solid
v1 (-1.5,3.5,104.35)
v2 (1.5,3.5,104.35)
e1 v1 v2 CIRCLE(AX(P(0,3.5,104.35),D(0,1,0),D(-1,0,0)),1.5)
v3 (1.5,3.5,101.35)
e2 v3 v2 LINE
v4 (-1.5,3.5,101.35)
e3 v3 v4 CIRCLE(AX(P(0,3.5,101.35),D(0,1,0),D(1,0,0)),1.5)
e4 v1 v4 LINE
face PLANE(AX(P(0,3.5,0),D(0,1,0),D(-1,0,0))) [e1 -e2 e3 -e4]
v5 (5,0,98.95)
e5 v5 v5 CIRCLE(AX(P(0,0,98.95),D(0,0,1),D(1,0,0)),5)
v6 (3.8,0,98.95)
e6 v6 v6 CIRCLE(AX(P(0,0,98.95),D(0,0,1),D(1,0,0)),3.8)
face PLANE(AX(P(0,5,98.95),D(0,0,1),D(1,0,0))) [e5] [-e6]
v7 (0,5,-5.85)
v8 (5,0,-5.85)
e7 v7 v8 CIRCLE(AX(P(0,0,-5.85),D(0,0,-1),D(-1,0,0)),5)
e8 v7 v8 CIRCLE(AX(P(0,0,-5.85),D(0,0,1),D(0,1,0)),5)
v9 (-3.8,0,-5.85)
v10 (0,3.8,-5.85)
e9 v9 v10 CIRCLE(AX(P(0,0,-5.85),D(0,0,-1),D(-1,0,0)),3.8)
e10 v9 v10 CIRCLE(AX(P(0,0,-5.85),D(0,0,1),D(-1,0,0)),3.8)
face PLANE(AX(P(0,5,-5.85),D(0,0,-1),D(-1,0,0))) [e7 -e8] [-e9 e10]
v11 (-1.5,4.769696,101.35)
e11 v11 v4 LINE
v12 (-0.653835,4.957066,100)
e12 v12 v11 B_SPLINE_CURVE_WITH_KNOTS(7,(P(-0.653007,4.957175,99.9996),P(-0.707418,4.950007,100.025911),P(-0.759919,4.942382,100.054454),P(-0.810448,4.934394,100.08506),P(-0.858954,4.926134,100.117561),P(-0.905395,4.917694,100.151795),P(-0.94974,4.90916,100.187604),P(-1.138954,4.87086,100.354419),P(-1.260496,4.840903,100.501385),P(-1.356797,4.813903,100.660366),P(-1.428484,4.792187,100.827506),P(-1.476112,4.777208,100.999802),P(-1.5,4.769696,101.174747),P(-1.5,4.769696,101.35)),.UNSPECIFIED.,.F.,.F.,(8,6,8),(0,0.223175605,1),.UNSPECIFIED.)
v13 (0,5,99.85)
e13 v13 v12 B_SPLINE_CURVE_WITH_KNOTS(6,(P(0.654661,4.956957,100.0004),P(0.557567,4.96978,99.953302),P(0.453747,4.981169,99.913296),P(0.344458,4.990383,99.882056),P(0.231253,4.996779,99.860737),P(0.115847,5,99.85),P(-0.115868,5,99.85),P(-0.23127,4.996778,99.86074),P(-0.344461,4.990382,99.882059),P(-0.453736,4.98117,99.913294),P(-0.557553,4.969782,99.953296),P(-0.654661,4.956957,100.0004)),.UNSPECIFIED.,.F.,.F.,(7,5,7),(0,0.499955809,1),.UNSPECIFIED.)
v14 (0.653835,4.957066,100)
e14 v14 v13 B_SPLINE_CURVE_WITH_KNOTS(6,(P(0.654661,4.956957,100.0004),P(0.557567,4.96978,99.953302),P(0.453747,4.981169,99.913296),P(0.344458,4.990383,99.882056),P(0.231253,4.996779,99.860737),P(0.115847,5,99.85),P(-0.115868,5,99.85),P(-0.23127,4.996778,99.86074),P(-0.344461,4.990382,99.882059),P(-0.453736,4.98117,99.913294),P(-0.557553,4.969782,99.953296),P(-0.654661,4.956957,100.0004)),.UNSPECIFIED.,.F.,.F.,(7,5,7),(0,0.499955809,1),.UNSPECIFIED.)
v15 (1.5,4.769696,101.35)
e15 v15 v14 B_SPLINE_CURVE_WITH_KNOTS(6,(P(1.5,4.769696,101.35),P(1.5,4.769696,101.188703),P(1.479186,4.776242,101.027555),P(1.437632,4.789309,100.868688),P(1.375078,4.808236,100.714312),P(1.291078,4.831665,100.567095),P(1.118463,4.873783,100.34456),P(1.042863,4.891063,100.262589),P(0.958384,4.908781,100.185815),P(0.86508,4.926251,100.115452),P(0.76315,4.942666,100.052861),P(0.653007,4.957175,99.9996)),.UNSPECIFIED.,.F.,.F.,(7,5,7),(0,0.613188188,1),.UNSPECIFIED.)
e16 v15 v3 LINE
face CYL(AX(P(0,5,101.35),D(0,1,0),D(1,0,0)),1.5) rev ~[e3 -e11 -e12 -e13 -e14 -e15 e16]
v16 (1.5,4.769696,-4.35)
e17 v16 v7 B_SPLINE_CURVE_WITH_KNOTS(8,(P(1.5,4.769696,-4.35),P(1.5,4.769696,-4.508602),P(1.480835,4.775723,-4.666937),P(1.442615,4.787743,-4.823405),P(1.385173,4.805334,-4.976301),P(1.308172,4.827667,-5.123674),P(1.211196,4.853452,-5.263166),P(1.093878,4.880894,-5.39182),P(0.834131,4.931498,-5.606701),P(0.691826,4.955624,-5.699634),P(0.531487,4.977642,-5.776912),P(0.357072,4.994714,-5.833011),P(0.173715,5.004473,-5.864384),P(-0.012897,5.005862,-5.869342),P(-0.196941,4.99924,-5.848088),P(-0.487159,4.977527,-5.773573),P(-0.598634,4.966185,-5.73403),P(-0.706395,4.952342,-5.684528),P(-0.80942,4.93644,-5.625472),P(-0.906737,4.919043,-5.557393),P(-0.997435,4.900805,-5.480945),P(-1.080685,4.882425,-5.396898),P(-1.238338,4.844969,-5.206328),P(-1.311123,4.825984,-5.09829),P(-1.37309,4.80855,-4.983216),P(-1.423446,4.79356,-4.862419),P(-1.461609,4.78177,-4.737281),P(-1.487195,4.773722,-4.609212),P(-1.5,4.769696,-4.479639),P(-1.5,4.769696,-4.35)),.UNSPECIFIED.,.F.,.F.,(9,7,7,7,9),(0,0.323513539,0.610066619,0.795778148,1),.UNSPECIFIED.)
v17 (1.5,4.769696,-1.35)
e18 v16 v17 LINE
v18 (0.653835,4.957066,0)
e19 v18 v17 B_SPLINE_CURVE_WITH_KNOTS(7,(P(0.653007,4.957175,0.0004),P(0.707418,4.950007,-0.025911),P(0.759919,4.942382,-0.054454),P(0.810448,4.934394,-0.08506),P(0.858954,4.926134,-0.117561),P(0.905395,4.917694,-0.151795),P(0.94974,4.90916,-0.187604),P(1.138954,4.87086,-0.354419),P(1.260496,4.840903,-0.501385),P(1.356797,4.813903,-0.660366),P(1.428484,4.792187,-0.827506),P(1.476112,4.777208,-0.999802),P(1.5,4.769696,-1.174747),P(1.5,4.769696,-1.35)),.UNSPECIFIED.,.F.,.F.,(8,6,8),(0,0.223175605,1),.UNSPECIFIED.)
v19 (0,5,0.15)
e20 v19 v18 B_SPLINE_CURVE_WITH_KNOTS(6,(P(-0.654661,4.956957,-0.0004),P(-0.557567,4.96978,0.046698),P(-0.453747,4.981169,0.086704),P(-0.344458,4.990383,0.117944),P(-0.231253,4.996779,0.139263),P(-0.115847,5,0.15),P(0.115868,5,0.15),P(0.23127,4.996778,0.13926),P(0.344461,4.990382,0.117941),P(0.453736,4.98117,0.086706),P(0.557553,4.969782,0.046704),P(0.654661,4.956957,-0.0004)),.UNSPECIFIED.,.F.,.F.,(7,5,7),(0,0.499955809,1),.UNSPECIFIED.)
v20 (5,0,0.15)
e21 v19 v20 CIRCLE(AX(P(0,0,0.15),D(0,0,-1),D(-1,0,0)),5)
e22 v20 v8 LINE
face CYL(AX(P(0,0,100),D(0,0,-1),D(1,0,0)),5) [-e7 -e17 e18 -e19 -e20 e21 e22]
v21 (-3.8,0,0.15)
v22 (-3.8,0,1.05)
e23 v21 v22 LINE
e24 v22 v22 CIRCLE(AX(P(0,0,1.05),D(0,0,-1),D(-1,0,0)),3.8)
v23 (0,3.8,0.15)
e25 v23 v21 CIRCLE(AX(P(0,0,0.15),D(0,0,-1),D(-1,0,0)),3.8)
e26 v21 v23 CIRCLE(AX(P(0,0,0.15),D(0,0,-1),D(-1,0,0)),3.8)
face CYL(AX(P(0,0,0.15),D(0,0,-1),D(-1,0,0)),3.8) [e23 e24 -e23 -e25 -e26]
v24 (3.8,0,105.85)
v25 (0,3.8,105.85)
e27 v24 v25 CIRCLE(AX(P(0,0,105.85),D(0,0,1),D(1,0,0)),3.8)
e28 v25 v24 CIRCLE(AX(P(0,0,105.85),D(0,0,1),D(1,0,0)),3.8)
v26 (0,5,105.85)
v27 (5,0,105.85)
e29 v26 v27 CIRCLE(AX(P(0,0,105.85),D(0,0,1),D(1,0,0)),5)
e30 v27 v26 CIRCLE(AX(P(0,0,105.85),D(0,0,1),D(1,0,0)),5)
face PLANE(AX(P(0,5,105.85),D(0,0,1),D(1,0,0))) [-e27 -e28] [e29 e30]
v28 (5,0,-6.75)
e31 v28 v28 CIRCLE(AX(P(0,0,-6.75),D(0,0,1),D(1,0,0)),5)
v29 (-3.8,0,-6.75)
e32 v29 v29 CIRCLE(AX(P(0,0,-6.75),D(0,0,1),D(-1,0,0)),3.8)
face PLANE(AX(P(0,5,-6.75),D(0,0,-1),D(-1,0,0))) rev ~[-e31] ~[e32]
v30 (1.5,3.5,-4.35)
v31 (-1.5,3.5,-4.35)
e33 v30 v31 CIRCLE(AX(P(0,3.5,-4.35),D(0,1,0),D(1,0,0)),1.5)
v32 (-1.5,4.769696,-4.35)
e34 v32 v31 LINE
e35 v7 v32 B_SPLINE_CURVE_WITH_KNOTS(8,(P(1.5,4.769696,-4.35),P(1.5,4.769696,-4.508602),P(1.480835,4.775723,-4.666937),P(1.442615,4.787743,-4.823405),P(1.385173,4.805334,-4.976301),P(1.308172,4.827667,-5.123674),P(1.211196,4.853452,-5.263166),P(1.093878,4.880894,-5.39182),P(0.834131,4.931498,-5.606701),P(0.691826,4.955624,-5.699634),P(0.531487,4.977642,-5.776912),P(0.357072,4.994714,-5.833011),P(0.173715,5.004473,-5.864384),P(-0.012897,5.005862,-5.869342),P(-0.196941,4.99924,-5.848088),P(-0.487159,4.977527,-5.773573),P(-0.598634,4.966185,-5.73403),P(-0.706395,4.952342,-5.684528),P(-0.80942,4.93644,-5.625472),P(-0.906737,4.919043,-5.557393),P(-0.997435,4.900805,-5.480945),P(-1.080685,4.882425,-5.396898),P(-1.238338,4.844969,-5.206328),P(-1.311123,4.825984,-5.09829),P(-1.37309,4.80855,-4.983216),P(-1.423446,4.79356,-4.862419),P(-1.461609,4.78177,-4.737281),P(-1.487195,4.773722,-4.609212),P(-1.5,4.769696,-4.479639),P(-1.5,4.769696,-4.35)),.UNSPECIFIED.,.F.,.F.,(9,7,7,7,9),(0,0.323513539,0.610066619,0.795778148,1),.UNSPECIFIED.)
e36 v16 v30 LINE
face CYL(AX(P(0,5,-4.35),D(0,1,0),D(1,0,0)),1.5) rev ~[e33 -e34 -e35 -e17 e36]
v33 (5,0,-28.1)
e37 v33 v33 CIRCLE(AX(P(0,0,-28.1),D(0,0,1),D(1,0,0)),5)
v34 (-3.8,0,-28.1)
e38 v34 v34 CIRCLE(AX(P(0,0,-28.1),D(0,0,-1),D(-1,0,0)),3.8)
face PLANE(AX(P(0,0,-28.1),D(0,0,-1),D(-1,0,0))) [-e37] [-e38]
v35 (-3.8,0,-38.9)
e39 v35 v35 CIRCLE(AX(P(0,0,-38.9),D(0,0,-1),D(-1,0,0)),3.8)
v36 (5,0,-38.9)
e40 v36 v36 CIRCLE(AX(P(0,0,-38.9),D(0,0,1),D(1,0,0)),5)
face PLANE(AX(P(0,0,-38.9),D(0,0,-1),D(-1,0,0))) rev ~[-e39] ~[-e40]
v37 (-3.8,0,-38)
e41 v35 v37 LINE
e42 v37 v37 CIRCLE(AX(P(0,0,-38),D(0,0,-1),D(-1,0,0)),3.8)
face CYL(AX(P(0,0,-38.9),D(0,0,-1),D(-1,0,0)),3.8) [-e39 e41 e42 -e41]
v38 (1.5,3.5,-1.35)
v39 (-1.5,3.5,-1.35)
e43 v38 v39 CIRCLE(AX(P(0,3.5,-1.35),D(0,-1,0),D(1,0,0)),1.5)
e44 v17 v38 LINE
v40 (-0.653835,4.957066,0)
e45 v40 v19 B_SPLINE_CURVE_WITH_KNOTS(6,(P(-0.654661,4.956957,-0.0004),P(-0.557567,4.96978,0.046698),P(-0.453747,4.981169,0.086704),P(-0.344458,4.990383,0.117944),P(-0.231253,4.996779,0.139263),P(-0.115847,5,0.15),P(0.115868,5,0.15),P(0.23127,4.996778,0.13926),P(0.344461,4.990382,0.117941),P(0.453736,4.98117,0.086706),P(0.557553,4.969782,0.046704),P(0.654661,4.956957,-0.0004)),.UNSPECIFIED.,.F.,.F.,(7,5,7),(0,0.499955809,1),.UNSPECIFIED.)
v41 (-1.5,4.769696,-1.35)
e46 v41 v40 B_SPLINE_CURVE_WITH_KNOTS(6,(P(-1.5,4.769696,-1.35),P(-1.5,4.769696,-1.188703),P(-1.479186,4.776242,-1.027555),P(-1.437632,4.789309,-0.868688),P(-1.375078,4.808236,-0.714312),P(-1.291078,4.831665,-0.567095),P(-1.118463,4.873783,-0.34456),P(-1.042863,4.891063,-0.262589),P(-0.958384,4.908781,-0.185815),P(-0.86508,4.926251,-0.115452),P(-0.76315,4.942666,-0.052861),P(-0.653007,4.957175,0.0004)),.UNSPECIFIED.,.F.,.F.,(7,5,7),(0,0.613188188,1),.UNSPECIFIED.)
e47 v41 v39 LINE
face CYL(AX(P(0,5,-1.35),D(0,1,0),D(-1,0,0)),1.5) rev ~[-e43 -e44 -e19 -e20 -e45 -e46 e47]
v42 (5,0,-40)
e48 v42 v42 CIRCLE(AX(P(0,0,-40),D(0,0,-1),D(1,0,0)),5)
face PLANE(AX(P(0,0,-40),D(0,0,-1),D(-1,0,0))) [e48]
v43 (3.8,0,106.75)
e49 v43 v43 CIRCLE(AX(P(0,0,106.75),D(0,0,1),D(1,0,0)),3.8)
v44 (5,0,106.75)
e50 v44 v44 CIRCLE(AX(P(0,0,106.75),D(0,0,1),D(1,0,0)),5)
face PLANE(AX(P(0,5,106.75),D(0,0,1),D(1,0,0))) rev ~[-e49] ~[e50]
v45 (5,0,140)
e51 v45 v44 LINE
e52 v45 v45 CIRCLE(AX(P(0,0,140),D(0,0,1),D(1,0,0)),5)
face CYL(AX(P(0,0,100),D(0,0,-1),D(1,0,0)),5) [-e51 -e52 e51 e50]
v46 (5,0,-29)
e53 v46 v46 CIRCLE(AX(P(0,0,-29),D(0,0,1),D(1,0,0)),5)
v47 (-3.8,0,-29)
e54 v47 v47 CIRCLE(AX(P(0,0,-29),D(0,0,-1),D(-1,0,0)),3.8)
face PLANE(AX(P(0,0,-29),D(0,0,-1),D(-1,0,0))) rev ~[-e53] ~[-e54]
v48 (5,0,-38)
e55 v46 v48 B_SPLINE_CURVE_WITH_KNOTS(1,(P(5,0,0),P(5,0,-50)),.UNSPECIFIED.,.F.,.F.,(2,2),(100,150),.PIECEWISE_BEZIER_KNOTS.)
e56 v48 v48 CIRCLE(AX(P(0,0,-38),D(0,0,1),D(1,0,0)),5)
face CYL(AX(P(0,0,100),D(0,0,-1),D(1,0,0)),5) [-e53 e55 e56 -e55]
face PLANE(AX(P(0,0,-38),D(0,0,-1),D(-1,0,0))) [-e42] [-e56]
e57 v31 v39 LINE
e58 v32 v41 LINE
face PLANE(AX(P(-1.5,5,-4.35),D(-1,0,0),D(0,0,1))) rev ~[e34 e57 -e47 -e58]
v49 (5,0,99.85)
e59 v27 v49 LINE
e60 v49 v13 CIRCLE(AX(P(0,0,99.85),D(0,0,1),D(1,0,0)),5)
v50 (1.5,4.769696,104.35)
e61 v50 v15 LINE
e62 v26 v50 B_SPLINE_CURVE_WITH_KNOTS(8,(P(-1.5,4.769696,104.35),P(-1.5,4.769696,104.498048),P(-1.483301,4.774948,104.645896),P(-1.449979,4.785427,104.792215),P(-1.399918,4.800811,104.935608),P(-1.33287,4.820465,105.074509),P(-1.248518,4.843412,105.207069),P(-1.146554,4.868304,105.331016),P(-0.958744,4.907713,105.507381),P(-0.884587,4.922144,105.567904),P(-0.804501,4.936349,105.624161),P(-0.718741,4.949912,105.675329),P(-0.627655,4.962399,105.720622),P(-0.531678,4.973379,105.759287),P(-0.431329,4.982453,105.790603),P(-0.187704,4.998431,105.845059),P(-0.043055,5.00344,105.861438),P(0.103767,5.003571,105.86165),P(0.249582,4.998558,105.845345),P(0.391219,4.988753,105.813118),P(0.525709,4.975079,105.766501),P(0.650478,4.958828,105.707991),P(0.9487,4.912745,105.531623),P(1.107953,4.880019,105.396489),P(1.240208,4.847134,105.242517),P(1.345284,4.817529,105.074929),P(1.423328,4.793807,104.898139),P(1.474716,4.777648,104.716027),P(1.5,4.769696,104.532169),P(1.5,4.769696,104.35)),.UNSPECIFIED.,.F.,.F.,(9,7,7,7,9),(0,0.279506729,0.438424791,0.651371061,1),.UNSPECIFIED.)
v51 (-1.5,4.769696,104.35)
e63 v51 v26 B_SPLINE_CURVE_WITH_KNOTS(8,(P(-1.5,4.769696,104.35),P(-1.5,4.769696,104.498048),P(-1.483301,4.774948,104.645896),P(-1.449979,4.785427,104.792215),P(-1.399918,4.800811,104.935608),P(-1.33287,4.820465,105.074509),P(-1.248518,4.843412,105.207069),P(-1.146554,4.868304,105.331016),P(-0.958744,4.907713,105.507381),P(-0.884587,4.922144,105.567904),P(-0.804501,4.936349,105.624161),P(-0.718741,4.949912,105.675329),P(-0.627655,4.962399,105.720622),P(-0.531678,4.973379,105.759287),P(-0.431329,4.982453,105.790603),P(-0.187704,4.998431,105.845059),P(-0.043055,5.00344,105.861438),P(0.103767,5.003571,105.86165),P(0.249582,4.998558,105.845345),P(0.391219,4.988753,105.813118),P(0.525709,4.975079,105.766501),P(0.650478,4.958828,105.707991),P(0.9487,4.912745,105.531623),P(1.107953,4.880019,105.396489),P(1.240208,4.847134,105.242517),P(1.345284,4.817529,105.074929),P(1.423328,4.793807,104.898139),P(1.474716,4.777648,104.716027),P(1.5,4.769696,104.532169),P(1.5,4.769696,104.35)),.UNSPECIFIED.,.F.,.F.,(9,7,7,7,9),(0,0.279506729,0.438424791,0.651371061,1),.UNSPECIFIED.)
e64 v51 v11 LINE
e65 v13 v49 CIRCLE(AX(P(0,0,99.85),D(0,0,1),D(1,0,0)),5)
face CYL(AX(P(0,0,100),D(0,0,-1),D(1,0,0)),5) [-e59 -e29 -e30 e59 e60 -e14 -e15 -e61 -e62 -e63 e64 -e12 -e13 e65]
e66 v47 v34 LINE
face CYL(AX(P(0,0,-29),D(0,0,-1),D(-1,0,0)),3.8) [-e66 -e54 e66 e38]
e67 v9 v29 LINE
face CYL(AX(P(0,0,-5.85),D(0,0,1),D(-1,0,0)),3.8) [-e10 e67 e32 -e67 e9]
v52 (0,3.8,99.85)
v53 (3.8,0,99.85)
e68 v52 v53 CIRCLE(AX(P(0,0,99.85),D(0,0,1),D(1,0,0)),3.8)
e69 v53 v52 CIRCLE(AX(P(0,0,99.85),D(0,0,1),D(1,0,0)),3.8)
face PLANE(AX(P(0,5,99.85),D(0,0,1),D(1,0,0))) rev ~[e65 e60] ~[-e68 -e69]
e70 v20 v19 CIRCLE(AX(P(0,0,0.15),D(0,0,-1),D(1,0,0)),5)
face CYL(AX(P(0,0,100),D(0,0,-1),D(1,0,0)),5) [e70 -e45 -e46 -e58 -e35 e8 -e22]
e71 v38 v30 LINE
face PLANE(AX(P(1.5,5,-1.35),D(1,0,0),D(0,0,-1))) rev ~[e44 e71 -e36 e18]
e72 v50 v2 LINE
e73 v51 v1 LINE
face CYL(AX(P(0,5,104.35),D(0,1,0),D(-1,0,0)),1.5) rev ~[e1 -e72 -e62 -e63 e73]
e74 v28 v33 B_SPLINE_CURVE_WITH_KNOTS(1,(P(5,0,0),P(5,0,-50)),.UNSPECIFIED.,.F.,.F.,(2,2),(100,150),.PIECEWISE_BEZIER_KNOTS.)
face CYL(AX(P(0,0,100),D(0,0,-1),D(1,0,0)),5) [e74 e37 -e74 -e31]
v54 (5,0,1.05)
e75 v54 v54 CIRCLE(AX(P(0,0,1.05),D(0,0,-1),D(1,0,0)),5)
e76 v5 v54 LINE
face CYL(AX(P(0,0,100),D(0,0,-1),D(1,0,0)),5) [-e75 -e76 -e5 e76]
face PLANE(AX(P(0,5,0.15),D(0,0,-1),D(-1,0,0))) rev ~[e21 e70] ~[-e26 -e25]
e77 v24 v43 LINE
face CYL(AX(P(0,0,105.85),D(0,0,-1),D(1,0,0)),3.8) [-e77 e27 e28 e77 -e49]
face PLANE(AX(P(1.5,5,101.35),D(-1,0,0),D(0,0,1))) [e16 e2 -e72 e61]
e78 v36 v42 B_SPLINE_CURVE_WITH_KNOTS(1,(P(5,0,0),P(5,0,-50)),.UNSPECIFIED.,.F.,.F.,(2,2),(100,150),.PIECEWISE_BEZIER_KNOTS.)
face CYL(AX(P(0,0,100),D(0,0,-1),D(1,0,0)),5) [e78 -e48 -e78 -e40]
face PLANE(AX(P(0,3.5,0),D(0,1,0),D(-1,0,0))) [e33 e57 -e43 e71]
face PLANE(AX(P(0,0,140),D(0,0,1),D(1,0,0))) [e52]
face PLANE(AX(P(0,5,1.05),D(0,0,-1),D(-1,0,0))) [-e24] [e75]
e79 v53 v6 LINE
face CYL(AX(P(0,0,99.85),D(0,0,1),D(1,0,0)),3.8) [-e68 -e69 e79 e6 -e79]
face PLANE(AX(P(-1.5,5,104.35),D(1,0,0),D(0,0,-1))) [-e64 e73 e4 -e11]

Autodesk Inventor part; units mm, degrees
sketch "Skizze1" plane through (0, 0, 0) normal (0, 0, 1) x (1, 0, 0)
  circle A0 centre (0, 0) radius 5
  dimension "d0" = 10
extrude "Extrusion1" add sketch "Skizze1" along normal blind 100
sketch "Skizze4" plane through (0, 0, 0) normal (0, 0, -1) x (-1, 0, 0)
  circle A0 centre (0, 0) radius 5
  circle A1 centre (0, 0) radius 5
  dimension "d15" = 10
extrude "Extrusion4" add sketch "Skizze4" along normal blind 50
sketch "Skizze5" plane through (0, 0, 100) normal (0, 0, 1) x (1, 0, 0)
  circle A0 centre (0, 0) radius 5
extrude "Extrusion5" add sketch "Skizze5" along normal blind 50
ref_plane "Arbeitsebene1" through (0, 5, 0) normal (0, 1, 0) x (-1, 0, 0)
sketch "Skizze6" plane through (0, 5, 0) normal (0, 1, 0) x (-1, 0, 0)
  line L0 (-5, -50) -> (5, -50) projected
  line L1 (0, -50) -> (0, 50)
  line L2 (0, 50) -> (0, 102.85)
  line L3 (0, 50) -> (0, -2.85)
  line L4 (0, -4.35) -> (0, -1.35) construction
  line L5 (1.5, -4.35) -> (1.5, -1.35)
  line L6 (-1.5, -1.35) -> (-1.5, -4.35)
  arc A0 (-1.5, -4.35) -> (1.5, -4.35) centre (0, -4.35) ccw
  arc A1 (1.5, -1.35) -> (-1.5, -1.35) centre (0, -1.35) ccw
  line L7 (0, 101.35) -> (0, 104.35) construction
  line L8 (-1.5, 101.35) -> (-1.5, 104.35)
  line L9 (1.5, 104.35) -> (1.5, 101.35)
  arc A2 (-1.5, 101.35) -> (1.5, 101.35) centre (0, 101.35) ccw
  arc A3 (1.5, 104.35) -> (-1.5, 104.35) centre (0, 104.35) ccw
  point P0 (0, 0)
  dimension "d21" = 100
  dimension "d22" = 52.85
  dimension "d23" = 52.85
  dimension "d27" = 1.5
  dimension "d28" = 6
  dimension "d29" = 1.5
  dimension "d33" = 3
extrude "Extrusion6" cut sketch "Skizze6" against normal blind 1.5
ref_plane "Arbeitsebene3" through (0, 5, 105.85) normal (0, 0, 1) x (1, 0, 0)
ref_plane "Arbeitsebene2" through (0, 5, 99.85) normal (0, 0, 1) x (1, 0, 0)
ref_plane "Arbeitsebene5" through (0, 5, -5.85) normal (0, 0, -1) x (-1, 0, 0)
ref_plane "Arbeitsebene4" through (0, 5, 0.15) normal (0, 0, -1) x (-1, 0, 0)
sketch "Skizze7" plane through (0, 5, -5.85) normal (0, 0, -1) x (-1, 0, 0)
  circle A0 centre (0, -5) radius 5
  circle A1 centre (0, -5) radius 3.8
  dimension "d34" = 7.6
extrude "Extrusion7" cut sketch "Skizze7" along normal blind 0.9
sketch "Skizze8" plane through (0, 5, 0.15) normal (0, 0, -1) x (-1, 0, 0)
  circle A0 centre (0, -5) radius 5
  circle A1 centre (0, -5) radius 3.8
  dimension "d37" = 7.6
extrude "Extrusion8" cut sketch "Skizze8" against normal blind 0.9
sketch "Skizze9" plane through (0, 5, 99.85) normal (0, 0, 1) x (1, 0, 0)
  circle A0 centre (0, -5) radius 5
  circle A1 centre (0, -5) radius 3.8
  dimension "d40" = 7.6
extrude "Extrusion9" cut sketch "Skizze9" against normal blind 0.9
sketch "Skizze10" plane through (0, 5, 105.85) normal (0, 0, 1) x (1, 0, 0)
  circle A0 centre (0, -5) radius 5
  circle A1 centre (0, -5) radius 3.8
extrude "Extrusion10" cut sketch "Skizze10" along normal blind 0.9
ref_plane "Arbeitsebene8" through (0, 0, -48.9) normal (0, 0, -1) x (-1, 0, 0)
sketch "Skizze13" plane through (0, 0, -48.9) normal (0, 0, -1) x (-1, 0, 0)
  circle A0 centre (0, 0) radius 5
  circle A1 centre (0, 0) radius 3.8
  dimension "d51" = 10
  dimension "d52" = 7.6
extrude "Extrusion11" cut sketch "Skizze13" against normal blind 0.9
sketch "Skizze14" plane through (0, 0, -50) normal (0, 0, -1) x (-1, 0, 0)
  circle A0 centre (0, 0) radius 3.8 projected
  circle A1 centre (0, 0) radius 5.0103
  point P0 (0, 3.8)
extrude "Extrusion12" cut sketch "Skizze14" against normal blind 10 contours A0 | A1
sketch "Skizze15" plane through (0, 0, 150) normal (0, 0, 1) x (1, 0, 0)
  circle A0 centre (0, 0) radius 5
  dimension "d57" = 10
extrude "Extrusion13" cut sketch "Skizze15" against normal blind 10
ref_plane "Arbeitsebene9" through (0, 0, -38.9) normal (0, 0, -1) x (-1, 0, 0)
sketch "Skizze16" plane through (0, 0, -38.9) normal (0, 0, -1) x (-1, 0, 0)
  circle A0 centre (0, 0) radius 5
  circle A1 centre (0, 0) radius 3.8
  dimension "d61" = 10
  dimension "d62" = 7.6
extrude "Extrusion14" cut sketch "Skizze16" against normal blind 0.9
ref_plane "Arbeitsebene10" through (0, 0, -29) normal (0, 0, -1) x (-1, 0, 0)
sketch "Skizze17" plane through (0, 0, -29) normal (0, 0, -1) x (-1, 0, 0)
  circle A0 centre (0, 0) radius 5
  circle A1 centre (0, 0) radius 3.8
extrude "Extrusion15" cut sketch "Skizze17" against normal blind 0.9
properties part number "Förderbandwelle_hinten"
